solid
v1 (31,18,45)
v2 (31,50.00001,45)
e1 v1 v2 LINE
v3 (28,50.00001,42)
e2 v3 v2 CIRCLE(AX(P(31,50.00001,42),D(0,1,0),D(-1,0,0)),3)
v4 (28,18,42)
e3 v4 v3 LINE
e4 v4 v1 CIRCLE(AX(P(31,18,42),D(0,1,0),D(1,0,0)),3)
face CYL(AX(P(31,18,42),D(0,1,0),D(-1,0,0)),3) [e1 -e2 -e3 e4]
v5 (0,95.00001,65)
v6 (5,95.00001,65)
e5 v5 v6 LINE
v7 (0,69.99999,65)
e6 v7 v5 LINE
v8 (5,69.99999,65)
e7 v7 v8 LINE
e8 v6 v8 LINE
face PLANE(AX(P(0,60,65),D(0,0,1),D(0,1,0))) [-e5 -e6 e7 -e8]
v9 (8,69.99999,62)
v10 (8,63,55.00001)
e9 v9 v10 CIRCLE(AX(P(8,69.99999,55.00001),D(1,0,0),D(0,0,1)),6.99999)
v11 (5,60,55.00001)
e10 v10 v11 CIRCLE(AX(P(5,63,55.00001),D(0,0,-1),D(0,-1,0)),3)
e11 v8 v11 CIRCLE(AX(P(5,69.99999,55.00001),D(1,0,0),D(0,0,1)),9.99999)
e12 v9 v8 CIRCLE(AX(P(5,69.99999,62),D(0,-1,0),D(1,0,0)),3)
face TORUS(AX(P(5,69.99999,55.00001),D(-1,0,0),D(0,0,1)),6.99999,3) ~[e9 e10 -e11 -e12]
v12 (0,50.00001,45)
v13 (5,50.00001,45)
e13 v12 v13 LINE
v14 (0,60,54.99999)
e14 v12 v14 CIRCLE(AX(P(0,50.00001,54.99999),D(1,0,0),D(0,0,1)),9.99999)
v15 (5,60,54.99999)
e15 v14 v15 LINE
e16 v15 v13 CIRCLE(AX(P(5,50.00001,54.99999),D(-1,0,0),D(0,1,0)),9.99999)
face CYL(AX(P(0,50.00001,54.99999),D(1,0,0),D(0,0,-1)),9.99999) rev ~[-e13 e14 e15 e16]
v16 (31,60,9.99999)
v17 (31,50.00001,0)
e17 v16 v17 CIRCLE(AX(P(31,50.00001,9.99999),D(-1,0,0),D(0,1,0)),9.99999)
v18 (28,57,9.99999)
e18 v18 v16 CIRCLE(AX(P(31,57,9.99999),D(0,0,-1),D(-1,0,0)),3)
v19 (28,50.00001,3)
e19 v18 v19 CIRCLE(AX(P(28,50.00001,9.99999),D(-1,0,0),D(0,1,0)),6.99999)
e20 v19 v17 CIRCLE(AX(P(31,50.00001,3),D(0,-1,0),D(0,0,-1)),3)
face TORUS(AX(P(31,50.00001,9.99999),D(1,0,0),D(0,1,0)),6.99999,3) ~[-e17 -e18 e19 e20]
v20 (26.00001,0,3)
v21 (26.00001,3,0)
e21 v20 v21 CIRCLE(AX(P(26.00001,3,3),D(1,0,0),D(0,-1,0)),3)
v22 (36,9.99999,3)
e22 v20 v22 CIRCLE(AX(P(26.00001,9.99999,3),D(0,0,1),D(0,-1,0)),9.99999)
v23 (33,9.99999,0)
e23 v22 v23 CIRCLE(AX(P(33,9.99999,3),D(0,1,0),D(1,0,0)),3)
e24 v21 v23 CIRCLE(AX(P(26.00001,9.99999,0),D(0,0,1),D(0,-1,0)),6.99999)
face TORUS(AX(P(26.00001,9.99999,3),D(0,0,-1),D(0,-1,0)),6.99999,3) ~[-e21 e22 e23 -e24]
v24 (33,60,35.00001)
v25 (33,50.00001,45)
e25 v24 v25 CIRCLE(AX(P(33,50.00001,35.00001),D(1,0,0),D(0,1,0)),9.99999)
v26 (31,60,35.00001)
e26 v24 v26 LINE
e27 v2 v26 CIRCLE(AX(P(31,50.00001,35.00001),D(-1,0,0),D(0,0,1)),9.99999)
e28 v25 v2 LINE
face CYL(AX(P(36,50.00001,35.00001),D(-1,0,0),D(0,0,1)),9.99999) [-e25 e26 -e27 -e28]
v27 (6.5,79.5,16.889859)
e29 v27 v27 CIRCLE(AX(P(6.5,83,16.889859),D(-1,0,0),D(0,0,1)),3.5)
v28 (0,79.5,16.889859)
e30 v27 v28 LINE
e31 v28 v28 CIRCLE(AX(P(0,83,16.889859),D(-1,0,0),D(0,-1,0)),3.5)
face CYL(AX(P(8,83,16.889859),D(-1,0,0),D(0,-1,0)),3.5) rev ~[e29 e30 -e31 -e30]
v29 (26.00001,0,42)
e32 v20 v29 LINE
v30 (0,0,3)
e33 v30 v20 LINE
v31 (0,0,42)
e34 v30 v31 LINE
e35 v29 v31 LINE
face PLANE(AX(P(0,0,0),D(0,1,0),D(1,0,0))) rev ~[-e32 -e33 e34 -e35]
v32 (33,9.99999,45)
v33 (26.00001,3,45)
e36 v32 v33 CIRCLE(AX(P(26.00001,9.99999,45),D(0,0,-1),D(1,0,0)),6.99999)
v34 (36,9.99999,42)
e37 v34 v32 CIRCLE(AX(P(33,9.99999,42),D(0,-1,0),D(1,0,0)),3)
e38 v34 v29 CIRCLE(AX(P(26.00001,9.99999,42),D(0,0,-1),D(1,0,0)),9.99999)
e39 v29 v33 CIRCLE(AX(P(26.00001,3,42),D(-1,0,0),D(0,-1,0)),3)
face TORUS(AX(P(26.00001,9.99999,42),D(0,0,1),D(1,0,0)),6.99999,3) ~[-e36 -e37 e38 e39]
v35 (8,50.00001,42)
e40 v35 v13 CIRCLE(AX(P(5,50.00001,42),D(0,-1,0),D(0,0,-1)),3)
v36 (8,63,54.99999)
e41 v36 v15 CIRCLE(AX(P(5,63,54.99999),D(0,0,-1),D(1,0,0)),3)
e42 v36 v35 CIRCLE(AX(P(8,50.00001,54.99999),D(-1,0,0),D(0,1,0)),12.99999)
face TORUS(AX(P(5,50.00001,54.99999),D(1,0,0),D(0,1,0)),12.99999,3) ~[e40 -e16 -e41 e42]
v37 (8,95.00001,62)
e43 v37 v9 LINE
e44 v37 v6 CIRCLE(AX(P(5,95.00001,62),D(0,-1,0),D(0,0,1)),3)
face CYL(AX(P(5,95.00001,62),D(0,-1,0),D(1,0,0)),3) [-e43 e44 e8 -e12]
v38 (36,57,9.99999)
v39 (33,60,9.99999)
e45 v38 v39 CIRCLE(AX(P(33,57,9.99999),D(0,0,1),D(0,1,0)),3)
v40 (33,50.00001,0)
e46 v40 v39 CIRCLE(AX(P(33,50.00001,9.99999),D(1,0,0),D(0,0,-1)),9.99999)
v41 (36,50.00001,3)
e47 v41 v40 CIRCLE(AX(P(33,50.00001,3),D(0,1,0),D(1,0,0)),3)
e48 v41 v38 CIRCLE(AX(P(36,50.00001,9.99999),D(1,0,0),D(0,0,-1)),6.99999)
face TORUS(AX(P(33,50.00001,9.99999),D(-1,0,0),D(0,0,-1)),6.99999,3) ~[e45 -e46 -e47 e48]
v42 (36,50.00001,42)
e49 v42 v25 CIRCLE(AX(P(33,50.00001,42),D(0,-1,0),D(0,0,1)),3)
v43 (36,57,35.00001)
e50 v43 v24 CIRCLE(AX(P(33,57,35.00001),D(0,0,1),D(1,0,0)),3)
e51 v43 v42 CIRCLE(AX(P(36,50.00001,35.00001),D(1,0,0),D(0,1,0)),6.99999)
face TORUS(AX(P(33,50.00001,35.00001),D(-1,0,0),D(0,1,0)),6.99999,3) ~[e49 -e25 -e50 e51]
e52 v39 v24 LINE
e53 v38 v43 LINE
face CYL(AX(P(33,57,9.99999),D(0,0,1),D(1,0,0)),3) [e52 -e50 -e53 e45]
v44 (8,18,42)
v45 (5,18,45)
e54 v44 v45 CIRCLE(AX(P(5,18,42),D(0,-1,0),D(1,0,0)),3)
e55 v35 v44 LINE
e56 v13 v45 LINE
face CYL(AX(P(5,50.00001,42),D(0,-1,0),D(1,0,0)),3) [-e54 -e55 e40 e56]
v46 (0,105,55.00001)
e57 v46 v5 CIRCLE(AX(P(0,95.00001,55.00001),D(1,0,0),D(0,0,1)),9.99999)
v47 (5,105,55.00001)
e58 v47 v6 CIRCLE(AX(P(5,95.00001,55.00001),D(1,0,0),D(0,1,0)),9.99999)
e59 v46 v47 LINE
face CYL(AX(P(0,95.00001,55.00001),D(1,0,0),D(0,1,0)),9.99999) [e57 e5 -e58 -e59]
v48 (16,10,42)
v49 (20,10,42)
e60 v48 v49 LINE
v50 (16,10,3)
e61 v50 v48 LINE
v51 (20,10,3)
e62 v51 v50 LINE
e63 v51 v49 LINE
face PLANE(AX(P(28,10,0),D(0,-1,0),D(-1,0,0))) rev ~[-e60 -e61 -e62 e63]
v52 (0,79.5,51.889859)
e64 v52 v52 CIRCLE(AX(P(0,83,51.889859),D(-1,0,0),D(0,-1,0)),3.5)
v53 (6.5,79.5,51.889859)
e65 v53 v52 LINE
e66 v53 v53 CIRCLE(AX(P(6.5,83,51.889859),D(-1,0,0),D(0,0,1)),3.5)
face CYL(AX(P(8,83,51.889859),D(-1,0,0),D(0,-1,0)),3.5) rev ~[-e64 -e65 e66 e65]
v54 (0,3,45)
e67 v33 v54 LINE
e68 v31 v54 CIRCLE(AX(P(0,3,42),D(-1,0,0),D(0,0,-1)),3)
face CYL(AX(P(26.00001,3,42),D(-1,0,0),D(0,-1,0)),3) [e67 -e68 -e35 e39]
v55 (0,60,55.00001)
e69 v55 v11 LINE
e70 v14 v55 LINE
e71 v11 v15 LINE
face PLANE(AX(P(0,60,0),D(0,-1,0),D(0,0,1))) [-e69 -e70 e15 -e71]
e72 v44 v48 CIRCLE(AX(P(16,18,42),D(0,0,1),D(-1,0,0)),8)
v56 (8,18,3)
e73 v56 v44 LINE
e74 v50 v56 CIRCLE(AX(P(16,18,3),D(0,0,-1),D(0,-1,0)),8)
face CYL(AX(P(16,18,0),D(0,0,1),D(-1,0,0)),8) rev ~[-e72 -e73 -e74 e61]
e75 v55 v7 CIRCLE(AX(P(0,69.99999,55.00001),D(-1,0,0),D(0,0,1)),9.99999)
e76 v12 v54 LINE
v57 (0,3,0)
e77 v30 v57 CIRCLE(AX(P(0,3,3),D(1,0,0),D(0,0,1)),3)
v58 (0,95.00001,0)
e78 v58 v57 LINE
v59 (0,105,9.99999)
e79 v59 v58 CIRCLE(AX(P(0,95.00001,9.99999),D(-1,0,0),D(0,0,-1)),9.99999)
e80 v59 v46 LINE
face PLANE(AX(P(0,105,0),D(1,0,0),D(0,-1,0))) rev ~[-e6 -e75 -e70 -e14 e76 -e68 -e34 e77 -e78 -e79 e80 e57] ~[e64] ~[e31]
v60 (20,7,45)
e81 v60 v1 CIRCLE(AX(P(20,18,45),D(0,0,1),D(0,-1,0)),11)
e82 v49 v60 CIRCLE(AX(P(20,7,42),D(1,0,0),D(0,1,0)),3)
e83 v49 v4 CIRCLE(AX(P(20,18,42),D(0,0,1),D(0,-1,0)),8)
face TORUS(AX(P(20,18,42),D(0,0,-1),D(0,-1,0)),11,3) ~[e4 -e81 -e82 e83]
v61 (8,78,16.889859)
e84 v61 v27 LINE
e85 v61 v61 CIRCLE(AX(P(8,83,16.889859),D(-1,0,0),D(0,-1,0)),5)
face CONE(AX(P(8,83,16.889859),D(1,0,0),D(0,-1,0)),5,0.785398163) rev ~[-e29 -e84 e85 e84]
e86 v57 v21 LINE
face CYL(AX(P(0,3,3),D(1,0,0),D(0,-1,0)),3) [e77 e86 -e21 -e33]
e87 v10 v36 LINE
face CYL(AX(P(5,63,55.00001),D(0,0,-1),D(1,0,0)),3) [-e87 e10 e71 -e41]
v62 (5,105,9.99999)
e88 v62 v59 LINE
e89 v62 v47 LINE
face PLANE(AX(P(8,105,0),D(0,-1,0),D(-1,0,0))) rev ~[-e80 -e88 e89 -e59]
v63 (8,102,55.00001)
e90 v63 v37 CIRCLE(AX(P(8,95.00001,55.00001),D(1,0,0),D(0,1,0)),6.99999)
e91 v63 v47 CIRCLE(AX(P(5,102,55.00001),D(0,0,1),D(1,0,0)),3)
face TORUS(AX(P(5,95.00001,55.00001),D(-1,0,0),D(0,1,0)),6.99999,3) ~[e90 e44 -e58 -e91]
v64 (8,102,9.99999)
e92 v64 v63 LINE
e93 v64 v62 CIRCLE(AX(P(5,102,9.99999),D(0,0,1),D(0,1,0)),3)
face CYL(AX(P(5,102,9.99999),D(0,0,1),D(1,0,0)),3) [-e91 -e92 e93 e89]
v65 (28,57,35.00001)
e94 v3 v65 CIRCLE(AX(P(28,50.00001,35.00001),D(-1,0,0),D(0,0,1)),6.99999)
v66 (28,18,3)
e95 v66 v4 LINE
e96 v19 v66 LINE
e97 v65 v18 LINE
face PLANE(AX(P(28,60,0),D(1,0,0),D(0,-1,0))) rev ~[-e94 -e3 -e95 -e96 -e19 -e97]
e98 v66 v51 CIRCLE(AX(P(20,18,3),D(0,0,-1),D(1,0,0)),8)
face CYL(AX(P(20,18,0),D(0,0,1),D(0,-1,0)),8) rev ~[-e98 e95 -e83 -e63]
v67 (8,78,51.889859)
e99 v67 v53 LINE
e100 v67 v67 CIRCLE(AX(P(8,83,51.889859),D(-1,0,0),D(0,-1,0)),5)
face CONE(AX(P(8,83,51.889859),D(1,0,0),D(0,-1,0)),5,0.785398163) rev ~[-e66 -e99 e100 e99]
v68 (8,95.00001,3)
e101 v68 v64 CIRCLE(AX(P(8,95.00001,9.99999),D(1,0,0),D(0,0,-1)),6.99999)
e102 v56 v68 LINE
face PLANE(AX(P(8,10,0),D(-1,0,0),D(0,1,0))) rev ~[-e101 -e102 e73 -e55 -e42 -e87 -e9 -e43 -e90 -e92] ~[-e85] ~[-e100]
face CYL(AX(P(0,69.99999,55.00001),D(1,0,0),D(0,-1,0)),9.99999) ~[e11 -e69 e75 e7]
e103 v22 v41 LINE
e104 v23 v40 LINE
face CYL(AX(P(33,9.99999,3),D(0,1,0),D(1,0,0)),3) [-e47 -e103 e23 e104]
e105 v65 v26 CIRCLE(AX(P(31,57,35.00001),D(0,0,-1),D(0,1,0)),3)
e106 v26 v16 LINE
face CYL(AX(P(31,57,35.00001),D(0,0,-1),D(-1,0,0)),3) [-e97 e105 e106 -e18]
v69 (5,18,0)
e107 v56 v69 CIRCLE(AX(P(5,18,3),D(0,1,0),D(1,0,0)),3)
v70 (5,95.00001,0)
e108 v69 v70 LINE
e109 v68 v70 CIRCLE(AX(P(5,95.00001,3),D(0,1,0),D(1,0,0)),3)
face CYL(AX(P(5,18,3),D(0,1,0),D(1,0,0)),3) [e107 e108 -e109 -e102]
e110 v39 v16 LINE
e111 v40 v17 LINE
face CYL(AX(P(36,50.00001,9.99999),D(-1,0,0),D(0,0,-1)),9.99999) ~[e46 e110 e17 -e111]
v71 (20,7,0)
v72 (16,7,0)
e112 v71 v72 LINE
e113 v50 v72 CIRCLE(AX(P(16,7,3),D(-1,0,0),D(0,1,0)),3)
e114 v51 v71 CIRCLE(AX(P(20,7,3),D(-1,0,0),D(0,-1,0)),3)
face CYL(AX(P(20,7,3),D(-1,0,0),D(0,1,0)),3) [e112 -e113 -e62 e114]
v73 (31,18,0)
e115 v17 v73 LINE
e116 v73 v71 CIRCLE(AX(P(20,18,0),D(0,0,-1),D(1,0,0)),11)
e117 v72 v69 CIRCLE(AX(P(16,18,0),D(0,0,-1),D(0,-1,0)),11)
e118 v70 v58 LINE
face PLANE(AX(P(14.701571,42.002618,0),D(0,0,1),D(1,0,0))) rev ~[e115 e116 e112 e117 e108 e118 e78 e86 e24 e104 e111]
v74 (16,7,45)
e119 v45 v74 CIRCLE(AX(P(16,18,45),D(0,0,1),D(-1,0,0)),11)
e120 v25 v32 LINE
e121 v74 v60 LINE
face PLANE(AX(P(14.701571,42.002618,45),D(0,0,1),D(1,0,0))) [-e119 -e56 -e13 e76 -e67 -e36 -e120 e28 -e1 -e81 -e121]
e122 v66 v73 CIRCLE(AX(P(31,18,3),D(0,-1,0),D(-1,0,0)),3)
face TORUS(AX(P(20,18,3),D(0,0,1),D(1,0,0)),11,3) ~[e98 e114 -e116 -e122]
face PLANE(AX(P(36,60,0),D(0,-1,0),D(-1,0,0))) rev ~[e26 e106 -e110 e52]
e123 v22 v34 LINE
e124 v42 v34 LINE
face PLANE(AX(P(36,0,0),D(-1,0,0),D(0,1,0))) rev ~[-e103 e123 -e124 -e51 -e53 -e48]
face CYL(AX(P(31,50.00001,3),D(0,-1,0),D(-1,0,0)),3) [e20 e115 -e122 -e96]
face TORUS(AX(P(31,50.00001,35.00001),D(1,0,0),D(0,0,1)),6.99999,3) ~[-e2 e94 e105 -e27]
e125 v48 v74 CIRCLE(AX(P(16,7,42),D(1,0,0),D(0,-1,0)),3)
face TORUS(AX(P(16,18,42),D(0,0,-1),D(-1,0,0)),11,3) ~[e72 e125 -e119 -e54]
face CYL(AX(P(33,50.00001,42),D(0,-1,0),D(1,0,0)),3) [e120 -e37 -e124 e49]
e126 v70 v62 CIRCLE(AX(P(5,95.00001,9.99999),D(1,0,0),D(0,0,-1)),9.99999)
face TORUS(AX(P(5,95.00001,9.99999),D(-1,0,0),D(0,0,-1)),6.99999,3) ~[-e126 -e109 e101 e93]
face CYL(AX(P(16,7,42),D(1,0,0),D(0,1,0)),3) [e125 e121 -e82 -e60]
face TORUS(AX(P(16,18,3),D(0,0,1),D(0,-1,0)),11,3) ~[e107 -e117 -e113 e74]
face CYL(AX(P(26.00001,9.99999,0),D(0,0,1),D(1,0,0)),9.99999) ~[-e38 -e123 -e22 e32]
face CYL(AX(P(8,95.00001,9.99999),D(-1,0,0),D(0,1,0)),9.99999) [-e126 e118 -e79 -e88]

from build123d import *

# Parameters (mm, degrees)
F1_DEPTH       = 45
F2_W           = 45
F2_H           = 65
F3_DEPTH       = 8
F4_R           = 9.99999
F6_R           = 8
F7_R           = 3
F9_D           = 7
F9_CSINK_D     = 10
F9_CSINK_ANGLE = 90


# Not quite as in the source:
# - two fillets or chamfers of one size are made in one step
# - a fillet or chamfer is up to 0.001 mm smaller than in the source, because OpenCascade refuses the exact size


with BuildPart() as f1:
    # F0 (on Top) → F1 (new body)
    with BuildSketch(Plane.XY):
        Polygon((8, 105), (0, 105), (0, 0), (36, 0), (36, 60), (28, 60), (28, 10), (8, 10), align=None)
    extrude(amount=F1_DEPTH)

    # F2 (on Right) → F3 (join, through all)
    with BuildSketch(Plane.YZ):
        with Locations((82.5, 32.5)):
            Rectangle(F2_W, F2_H)
    extrude(amount=F3_DEPTH)

    # F4 (radius 10 in the source; OpenCascade refuses exactly that, so slightly less here)
    f4_edges = [f1.edges().sort_by_distance(p)[0] for p in [
        (4, 60, 45),
        (4, 105, 0),
        (4, 105, 65),
        (4, 60, 65),
        (32, 60, 45),
        (32, 60, 0),
        (36, 0, 22.5),
    ]]
    fillet(f4_edges, radius=F4_R)

    # F6
    f6_edges = [f1.edges().sort_by_distance(p)[0] for p in [
        (8, 10, 22.5),
        (28, 10, 22.5),
    ]]
    fillet(f6_edges, radius=F6_R)

    # F7
    f7_edges = [f1.edges().sort_by_distance(p)[0] for p in [
        (36, 60, 22.5),
        (36, 57.071071, 2.928929),
        (36, 57.071071, 42.071071),
        (36, 30, 0),
        (36, 30, 45),
        (36, 9.99999, 22.5),
        (8, 56.500005, 0),
        (8, 18, 22.5),
        (8, 102.071071, 2.928929),
        (8, 34.000005, 45),
        (8, 105, 32.5),
        (8, 57.071071, 47.928929),
        (8, 102.071071, 62.071071),
        (8, 60, 55),
        (8, 82.5, 65),
        (8, 62.928929, 62.071071),
        (10.343146, 12.343146, 0),
        (18, 10, 0),
        (25.656854, 12.343146, 0),
        (13.000005, 0, 0),
        (28, 34.000005, 0),
        (33.071071, 2.928929, 0),
        (10.343146, 12.343146, 45),
        (18, 10, 45),
        (25.656854, 12.343146, 45),
        (13.000005, 0, 45),
        (28, 34.000005, 45),
        (33.071071, 2.928929, 45),
        (28, 57.071071, 2.928929),
        (28, 60, 22.5),
        (28, 57.071071, 42.071071),
    ]]
    fillet(f7_edges, radius=F7_R)

    # F9 (through all)
    with Locations(Plane.YZ.offset(8)):
        with Locations((83, 51.8898591027), (83, 16.8898591027)):
            CounterSinkHole(F9_D / 2, F9_CSINK_D / 2, counter_sink_angle=F9_CSINK_ANGLE)


solid = f1.part
